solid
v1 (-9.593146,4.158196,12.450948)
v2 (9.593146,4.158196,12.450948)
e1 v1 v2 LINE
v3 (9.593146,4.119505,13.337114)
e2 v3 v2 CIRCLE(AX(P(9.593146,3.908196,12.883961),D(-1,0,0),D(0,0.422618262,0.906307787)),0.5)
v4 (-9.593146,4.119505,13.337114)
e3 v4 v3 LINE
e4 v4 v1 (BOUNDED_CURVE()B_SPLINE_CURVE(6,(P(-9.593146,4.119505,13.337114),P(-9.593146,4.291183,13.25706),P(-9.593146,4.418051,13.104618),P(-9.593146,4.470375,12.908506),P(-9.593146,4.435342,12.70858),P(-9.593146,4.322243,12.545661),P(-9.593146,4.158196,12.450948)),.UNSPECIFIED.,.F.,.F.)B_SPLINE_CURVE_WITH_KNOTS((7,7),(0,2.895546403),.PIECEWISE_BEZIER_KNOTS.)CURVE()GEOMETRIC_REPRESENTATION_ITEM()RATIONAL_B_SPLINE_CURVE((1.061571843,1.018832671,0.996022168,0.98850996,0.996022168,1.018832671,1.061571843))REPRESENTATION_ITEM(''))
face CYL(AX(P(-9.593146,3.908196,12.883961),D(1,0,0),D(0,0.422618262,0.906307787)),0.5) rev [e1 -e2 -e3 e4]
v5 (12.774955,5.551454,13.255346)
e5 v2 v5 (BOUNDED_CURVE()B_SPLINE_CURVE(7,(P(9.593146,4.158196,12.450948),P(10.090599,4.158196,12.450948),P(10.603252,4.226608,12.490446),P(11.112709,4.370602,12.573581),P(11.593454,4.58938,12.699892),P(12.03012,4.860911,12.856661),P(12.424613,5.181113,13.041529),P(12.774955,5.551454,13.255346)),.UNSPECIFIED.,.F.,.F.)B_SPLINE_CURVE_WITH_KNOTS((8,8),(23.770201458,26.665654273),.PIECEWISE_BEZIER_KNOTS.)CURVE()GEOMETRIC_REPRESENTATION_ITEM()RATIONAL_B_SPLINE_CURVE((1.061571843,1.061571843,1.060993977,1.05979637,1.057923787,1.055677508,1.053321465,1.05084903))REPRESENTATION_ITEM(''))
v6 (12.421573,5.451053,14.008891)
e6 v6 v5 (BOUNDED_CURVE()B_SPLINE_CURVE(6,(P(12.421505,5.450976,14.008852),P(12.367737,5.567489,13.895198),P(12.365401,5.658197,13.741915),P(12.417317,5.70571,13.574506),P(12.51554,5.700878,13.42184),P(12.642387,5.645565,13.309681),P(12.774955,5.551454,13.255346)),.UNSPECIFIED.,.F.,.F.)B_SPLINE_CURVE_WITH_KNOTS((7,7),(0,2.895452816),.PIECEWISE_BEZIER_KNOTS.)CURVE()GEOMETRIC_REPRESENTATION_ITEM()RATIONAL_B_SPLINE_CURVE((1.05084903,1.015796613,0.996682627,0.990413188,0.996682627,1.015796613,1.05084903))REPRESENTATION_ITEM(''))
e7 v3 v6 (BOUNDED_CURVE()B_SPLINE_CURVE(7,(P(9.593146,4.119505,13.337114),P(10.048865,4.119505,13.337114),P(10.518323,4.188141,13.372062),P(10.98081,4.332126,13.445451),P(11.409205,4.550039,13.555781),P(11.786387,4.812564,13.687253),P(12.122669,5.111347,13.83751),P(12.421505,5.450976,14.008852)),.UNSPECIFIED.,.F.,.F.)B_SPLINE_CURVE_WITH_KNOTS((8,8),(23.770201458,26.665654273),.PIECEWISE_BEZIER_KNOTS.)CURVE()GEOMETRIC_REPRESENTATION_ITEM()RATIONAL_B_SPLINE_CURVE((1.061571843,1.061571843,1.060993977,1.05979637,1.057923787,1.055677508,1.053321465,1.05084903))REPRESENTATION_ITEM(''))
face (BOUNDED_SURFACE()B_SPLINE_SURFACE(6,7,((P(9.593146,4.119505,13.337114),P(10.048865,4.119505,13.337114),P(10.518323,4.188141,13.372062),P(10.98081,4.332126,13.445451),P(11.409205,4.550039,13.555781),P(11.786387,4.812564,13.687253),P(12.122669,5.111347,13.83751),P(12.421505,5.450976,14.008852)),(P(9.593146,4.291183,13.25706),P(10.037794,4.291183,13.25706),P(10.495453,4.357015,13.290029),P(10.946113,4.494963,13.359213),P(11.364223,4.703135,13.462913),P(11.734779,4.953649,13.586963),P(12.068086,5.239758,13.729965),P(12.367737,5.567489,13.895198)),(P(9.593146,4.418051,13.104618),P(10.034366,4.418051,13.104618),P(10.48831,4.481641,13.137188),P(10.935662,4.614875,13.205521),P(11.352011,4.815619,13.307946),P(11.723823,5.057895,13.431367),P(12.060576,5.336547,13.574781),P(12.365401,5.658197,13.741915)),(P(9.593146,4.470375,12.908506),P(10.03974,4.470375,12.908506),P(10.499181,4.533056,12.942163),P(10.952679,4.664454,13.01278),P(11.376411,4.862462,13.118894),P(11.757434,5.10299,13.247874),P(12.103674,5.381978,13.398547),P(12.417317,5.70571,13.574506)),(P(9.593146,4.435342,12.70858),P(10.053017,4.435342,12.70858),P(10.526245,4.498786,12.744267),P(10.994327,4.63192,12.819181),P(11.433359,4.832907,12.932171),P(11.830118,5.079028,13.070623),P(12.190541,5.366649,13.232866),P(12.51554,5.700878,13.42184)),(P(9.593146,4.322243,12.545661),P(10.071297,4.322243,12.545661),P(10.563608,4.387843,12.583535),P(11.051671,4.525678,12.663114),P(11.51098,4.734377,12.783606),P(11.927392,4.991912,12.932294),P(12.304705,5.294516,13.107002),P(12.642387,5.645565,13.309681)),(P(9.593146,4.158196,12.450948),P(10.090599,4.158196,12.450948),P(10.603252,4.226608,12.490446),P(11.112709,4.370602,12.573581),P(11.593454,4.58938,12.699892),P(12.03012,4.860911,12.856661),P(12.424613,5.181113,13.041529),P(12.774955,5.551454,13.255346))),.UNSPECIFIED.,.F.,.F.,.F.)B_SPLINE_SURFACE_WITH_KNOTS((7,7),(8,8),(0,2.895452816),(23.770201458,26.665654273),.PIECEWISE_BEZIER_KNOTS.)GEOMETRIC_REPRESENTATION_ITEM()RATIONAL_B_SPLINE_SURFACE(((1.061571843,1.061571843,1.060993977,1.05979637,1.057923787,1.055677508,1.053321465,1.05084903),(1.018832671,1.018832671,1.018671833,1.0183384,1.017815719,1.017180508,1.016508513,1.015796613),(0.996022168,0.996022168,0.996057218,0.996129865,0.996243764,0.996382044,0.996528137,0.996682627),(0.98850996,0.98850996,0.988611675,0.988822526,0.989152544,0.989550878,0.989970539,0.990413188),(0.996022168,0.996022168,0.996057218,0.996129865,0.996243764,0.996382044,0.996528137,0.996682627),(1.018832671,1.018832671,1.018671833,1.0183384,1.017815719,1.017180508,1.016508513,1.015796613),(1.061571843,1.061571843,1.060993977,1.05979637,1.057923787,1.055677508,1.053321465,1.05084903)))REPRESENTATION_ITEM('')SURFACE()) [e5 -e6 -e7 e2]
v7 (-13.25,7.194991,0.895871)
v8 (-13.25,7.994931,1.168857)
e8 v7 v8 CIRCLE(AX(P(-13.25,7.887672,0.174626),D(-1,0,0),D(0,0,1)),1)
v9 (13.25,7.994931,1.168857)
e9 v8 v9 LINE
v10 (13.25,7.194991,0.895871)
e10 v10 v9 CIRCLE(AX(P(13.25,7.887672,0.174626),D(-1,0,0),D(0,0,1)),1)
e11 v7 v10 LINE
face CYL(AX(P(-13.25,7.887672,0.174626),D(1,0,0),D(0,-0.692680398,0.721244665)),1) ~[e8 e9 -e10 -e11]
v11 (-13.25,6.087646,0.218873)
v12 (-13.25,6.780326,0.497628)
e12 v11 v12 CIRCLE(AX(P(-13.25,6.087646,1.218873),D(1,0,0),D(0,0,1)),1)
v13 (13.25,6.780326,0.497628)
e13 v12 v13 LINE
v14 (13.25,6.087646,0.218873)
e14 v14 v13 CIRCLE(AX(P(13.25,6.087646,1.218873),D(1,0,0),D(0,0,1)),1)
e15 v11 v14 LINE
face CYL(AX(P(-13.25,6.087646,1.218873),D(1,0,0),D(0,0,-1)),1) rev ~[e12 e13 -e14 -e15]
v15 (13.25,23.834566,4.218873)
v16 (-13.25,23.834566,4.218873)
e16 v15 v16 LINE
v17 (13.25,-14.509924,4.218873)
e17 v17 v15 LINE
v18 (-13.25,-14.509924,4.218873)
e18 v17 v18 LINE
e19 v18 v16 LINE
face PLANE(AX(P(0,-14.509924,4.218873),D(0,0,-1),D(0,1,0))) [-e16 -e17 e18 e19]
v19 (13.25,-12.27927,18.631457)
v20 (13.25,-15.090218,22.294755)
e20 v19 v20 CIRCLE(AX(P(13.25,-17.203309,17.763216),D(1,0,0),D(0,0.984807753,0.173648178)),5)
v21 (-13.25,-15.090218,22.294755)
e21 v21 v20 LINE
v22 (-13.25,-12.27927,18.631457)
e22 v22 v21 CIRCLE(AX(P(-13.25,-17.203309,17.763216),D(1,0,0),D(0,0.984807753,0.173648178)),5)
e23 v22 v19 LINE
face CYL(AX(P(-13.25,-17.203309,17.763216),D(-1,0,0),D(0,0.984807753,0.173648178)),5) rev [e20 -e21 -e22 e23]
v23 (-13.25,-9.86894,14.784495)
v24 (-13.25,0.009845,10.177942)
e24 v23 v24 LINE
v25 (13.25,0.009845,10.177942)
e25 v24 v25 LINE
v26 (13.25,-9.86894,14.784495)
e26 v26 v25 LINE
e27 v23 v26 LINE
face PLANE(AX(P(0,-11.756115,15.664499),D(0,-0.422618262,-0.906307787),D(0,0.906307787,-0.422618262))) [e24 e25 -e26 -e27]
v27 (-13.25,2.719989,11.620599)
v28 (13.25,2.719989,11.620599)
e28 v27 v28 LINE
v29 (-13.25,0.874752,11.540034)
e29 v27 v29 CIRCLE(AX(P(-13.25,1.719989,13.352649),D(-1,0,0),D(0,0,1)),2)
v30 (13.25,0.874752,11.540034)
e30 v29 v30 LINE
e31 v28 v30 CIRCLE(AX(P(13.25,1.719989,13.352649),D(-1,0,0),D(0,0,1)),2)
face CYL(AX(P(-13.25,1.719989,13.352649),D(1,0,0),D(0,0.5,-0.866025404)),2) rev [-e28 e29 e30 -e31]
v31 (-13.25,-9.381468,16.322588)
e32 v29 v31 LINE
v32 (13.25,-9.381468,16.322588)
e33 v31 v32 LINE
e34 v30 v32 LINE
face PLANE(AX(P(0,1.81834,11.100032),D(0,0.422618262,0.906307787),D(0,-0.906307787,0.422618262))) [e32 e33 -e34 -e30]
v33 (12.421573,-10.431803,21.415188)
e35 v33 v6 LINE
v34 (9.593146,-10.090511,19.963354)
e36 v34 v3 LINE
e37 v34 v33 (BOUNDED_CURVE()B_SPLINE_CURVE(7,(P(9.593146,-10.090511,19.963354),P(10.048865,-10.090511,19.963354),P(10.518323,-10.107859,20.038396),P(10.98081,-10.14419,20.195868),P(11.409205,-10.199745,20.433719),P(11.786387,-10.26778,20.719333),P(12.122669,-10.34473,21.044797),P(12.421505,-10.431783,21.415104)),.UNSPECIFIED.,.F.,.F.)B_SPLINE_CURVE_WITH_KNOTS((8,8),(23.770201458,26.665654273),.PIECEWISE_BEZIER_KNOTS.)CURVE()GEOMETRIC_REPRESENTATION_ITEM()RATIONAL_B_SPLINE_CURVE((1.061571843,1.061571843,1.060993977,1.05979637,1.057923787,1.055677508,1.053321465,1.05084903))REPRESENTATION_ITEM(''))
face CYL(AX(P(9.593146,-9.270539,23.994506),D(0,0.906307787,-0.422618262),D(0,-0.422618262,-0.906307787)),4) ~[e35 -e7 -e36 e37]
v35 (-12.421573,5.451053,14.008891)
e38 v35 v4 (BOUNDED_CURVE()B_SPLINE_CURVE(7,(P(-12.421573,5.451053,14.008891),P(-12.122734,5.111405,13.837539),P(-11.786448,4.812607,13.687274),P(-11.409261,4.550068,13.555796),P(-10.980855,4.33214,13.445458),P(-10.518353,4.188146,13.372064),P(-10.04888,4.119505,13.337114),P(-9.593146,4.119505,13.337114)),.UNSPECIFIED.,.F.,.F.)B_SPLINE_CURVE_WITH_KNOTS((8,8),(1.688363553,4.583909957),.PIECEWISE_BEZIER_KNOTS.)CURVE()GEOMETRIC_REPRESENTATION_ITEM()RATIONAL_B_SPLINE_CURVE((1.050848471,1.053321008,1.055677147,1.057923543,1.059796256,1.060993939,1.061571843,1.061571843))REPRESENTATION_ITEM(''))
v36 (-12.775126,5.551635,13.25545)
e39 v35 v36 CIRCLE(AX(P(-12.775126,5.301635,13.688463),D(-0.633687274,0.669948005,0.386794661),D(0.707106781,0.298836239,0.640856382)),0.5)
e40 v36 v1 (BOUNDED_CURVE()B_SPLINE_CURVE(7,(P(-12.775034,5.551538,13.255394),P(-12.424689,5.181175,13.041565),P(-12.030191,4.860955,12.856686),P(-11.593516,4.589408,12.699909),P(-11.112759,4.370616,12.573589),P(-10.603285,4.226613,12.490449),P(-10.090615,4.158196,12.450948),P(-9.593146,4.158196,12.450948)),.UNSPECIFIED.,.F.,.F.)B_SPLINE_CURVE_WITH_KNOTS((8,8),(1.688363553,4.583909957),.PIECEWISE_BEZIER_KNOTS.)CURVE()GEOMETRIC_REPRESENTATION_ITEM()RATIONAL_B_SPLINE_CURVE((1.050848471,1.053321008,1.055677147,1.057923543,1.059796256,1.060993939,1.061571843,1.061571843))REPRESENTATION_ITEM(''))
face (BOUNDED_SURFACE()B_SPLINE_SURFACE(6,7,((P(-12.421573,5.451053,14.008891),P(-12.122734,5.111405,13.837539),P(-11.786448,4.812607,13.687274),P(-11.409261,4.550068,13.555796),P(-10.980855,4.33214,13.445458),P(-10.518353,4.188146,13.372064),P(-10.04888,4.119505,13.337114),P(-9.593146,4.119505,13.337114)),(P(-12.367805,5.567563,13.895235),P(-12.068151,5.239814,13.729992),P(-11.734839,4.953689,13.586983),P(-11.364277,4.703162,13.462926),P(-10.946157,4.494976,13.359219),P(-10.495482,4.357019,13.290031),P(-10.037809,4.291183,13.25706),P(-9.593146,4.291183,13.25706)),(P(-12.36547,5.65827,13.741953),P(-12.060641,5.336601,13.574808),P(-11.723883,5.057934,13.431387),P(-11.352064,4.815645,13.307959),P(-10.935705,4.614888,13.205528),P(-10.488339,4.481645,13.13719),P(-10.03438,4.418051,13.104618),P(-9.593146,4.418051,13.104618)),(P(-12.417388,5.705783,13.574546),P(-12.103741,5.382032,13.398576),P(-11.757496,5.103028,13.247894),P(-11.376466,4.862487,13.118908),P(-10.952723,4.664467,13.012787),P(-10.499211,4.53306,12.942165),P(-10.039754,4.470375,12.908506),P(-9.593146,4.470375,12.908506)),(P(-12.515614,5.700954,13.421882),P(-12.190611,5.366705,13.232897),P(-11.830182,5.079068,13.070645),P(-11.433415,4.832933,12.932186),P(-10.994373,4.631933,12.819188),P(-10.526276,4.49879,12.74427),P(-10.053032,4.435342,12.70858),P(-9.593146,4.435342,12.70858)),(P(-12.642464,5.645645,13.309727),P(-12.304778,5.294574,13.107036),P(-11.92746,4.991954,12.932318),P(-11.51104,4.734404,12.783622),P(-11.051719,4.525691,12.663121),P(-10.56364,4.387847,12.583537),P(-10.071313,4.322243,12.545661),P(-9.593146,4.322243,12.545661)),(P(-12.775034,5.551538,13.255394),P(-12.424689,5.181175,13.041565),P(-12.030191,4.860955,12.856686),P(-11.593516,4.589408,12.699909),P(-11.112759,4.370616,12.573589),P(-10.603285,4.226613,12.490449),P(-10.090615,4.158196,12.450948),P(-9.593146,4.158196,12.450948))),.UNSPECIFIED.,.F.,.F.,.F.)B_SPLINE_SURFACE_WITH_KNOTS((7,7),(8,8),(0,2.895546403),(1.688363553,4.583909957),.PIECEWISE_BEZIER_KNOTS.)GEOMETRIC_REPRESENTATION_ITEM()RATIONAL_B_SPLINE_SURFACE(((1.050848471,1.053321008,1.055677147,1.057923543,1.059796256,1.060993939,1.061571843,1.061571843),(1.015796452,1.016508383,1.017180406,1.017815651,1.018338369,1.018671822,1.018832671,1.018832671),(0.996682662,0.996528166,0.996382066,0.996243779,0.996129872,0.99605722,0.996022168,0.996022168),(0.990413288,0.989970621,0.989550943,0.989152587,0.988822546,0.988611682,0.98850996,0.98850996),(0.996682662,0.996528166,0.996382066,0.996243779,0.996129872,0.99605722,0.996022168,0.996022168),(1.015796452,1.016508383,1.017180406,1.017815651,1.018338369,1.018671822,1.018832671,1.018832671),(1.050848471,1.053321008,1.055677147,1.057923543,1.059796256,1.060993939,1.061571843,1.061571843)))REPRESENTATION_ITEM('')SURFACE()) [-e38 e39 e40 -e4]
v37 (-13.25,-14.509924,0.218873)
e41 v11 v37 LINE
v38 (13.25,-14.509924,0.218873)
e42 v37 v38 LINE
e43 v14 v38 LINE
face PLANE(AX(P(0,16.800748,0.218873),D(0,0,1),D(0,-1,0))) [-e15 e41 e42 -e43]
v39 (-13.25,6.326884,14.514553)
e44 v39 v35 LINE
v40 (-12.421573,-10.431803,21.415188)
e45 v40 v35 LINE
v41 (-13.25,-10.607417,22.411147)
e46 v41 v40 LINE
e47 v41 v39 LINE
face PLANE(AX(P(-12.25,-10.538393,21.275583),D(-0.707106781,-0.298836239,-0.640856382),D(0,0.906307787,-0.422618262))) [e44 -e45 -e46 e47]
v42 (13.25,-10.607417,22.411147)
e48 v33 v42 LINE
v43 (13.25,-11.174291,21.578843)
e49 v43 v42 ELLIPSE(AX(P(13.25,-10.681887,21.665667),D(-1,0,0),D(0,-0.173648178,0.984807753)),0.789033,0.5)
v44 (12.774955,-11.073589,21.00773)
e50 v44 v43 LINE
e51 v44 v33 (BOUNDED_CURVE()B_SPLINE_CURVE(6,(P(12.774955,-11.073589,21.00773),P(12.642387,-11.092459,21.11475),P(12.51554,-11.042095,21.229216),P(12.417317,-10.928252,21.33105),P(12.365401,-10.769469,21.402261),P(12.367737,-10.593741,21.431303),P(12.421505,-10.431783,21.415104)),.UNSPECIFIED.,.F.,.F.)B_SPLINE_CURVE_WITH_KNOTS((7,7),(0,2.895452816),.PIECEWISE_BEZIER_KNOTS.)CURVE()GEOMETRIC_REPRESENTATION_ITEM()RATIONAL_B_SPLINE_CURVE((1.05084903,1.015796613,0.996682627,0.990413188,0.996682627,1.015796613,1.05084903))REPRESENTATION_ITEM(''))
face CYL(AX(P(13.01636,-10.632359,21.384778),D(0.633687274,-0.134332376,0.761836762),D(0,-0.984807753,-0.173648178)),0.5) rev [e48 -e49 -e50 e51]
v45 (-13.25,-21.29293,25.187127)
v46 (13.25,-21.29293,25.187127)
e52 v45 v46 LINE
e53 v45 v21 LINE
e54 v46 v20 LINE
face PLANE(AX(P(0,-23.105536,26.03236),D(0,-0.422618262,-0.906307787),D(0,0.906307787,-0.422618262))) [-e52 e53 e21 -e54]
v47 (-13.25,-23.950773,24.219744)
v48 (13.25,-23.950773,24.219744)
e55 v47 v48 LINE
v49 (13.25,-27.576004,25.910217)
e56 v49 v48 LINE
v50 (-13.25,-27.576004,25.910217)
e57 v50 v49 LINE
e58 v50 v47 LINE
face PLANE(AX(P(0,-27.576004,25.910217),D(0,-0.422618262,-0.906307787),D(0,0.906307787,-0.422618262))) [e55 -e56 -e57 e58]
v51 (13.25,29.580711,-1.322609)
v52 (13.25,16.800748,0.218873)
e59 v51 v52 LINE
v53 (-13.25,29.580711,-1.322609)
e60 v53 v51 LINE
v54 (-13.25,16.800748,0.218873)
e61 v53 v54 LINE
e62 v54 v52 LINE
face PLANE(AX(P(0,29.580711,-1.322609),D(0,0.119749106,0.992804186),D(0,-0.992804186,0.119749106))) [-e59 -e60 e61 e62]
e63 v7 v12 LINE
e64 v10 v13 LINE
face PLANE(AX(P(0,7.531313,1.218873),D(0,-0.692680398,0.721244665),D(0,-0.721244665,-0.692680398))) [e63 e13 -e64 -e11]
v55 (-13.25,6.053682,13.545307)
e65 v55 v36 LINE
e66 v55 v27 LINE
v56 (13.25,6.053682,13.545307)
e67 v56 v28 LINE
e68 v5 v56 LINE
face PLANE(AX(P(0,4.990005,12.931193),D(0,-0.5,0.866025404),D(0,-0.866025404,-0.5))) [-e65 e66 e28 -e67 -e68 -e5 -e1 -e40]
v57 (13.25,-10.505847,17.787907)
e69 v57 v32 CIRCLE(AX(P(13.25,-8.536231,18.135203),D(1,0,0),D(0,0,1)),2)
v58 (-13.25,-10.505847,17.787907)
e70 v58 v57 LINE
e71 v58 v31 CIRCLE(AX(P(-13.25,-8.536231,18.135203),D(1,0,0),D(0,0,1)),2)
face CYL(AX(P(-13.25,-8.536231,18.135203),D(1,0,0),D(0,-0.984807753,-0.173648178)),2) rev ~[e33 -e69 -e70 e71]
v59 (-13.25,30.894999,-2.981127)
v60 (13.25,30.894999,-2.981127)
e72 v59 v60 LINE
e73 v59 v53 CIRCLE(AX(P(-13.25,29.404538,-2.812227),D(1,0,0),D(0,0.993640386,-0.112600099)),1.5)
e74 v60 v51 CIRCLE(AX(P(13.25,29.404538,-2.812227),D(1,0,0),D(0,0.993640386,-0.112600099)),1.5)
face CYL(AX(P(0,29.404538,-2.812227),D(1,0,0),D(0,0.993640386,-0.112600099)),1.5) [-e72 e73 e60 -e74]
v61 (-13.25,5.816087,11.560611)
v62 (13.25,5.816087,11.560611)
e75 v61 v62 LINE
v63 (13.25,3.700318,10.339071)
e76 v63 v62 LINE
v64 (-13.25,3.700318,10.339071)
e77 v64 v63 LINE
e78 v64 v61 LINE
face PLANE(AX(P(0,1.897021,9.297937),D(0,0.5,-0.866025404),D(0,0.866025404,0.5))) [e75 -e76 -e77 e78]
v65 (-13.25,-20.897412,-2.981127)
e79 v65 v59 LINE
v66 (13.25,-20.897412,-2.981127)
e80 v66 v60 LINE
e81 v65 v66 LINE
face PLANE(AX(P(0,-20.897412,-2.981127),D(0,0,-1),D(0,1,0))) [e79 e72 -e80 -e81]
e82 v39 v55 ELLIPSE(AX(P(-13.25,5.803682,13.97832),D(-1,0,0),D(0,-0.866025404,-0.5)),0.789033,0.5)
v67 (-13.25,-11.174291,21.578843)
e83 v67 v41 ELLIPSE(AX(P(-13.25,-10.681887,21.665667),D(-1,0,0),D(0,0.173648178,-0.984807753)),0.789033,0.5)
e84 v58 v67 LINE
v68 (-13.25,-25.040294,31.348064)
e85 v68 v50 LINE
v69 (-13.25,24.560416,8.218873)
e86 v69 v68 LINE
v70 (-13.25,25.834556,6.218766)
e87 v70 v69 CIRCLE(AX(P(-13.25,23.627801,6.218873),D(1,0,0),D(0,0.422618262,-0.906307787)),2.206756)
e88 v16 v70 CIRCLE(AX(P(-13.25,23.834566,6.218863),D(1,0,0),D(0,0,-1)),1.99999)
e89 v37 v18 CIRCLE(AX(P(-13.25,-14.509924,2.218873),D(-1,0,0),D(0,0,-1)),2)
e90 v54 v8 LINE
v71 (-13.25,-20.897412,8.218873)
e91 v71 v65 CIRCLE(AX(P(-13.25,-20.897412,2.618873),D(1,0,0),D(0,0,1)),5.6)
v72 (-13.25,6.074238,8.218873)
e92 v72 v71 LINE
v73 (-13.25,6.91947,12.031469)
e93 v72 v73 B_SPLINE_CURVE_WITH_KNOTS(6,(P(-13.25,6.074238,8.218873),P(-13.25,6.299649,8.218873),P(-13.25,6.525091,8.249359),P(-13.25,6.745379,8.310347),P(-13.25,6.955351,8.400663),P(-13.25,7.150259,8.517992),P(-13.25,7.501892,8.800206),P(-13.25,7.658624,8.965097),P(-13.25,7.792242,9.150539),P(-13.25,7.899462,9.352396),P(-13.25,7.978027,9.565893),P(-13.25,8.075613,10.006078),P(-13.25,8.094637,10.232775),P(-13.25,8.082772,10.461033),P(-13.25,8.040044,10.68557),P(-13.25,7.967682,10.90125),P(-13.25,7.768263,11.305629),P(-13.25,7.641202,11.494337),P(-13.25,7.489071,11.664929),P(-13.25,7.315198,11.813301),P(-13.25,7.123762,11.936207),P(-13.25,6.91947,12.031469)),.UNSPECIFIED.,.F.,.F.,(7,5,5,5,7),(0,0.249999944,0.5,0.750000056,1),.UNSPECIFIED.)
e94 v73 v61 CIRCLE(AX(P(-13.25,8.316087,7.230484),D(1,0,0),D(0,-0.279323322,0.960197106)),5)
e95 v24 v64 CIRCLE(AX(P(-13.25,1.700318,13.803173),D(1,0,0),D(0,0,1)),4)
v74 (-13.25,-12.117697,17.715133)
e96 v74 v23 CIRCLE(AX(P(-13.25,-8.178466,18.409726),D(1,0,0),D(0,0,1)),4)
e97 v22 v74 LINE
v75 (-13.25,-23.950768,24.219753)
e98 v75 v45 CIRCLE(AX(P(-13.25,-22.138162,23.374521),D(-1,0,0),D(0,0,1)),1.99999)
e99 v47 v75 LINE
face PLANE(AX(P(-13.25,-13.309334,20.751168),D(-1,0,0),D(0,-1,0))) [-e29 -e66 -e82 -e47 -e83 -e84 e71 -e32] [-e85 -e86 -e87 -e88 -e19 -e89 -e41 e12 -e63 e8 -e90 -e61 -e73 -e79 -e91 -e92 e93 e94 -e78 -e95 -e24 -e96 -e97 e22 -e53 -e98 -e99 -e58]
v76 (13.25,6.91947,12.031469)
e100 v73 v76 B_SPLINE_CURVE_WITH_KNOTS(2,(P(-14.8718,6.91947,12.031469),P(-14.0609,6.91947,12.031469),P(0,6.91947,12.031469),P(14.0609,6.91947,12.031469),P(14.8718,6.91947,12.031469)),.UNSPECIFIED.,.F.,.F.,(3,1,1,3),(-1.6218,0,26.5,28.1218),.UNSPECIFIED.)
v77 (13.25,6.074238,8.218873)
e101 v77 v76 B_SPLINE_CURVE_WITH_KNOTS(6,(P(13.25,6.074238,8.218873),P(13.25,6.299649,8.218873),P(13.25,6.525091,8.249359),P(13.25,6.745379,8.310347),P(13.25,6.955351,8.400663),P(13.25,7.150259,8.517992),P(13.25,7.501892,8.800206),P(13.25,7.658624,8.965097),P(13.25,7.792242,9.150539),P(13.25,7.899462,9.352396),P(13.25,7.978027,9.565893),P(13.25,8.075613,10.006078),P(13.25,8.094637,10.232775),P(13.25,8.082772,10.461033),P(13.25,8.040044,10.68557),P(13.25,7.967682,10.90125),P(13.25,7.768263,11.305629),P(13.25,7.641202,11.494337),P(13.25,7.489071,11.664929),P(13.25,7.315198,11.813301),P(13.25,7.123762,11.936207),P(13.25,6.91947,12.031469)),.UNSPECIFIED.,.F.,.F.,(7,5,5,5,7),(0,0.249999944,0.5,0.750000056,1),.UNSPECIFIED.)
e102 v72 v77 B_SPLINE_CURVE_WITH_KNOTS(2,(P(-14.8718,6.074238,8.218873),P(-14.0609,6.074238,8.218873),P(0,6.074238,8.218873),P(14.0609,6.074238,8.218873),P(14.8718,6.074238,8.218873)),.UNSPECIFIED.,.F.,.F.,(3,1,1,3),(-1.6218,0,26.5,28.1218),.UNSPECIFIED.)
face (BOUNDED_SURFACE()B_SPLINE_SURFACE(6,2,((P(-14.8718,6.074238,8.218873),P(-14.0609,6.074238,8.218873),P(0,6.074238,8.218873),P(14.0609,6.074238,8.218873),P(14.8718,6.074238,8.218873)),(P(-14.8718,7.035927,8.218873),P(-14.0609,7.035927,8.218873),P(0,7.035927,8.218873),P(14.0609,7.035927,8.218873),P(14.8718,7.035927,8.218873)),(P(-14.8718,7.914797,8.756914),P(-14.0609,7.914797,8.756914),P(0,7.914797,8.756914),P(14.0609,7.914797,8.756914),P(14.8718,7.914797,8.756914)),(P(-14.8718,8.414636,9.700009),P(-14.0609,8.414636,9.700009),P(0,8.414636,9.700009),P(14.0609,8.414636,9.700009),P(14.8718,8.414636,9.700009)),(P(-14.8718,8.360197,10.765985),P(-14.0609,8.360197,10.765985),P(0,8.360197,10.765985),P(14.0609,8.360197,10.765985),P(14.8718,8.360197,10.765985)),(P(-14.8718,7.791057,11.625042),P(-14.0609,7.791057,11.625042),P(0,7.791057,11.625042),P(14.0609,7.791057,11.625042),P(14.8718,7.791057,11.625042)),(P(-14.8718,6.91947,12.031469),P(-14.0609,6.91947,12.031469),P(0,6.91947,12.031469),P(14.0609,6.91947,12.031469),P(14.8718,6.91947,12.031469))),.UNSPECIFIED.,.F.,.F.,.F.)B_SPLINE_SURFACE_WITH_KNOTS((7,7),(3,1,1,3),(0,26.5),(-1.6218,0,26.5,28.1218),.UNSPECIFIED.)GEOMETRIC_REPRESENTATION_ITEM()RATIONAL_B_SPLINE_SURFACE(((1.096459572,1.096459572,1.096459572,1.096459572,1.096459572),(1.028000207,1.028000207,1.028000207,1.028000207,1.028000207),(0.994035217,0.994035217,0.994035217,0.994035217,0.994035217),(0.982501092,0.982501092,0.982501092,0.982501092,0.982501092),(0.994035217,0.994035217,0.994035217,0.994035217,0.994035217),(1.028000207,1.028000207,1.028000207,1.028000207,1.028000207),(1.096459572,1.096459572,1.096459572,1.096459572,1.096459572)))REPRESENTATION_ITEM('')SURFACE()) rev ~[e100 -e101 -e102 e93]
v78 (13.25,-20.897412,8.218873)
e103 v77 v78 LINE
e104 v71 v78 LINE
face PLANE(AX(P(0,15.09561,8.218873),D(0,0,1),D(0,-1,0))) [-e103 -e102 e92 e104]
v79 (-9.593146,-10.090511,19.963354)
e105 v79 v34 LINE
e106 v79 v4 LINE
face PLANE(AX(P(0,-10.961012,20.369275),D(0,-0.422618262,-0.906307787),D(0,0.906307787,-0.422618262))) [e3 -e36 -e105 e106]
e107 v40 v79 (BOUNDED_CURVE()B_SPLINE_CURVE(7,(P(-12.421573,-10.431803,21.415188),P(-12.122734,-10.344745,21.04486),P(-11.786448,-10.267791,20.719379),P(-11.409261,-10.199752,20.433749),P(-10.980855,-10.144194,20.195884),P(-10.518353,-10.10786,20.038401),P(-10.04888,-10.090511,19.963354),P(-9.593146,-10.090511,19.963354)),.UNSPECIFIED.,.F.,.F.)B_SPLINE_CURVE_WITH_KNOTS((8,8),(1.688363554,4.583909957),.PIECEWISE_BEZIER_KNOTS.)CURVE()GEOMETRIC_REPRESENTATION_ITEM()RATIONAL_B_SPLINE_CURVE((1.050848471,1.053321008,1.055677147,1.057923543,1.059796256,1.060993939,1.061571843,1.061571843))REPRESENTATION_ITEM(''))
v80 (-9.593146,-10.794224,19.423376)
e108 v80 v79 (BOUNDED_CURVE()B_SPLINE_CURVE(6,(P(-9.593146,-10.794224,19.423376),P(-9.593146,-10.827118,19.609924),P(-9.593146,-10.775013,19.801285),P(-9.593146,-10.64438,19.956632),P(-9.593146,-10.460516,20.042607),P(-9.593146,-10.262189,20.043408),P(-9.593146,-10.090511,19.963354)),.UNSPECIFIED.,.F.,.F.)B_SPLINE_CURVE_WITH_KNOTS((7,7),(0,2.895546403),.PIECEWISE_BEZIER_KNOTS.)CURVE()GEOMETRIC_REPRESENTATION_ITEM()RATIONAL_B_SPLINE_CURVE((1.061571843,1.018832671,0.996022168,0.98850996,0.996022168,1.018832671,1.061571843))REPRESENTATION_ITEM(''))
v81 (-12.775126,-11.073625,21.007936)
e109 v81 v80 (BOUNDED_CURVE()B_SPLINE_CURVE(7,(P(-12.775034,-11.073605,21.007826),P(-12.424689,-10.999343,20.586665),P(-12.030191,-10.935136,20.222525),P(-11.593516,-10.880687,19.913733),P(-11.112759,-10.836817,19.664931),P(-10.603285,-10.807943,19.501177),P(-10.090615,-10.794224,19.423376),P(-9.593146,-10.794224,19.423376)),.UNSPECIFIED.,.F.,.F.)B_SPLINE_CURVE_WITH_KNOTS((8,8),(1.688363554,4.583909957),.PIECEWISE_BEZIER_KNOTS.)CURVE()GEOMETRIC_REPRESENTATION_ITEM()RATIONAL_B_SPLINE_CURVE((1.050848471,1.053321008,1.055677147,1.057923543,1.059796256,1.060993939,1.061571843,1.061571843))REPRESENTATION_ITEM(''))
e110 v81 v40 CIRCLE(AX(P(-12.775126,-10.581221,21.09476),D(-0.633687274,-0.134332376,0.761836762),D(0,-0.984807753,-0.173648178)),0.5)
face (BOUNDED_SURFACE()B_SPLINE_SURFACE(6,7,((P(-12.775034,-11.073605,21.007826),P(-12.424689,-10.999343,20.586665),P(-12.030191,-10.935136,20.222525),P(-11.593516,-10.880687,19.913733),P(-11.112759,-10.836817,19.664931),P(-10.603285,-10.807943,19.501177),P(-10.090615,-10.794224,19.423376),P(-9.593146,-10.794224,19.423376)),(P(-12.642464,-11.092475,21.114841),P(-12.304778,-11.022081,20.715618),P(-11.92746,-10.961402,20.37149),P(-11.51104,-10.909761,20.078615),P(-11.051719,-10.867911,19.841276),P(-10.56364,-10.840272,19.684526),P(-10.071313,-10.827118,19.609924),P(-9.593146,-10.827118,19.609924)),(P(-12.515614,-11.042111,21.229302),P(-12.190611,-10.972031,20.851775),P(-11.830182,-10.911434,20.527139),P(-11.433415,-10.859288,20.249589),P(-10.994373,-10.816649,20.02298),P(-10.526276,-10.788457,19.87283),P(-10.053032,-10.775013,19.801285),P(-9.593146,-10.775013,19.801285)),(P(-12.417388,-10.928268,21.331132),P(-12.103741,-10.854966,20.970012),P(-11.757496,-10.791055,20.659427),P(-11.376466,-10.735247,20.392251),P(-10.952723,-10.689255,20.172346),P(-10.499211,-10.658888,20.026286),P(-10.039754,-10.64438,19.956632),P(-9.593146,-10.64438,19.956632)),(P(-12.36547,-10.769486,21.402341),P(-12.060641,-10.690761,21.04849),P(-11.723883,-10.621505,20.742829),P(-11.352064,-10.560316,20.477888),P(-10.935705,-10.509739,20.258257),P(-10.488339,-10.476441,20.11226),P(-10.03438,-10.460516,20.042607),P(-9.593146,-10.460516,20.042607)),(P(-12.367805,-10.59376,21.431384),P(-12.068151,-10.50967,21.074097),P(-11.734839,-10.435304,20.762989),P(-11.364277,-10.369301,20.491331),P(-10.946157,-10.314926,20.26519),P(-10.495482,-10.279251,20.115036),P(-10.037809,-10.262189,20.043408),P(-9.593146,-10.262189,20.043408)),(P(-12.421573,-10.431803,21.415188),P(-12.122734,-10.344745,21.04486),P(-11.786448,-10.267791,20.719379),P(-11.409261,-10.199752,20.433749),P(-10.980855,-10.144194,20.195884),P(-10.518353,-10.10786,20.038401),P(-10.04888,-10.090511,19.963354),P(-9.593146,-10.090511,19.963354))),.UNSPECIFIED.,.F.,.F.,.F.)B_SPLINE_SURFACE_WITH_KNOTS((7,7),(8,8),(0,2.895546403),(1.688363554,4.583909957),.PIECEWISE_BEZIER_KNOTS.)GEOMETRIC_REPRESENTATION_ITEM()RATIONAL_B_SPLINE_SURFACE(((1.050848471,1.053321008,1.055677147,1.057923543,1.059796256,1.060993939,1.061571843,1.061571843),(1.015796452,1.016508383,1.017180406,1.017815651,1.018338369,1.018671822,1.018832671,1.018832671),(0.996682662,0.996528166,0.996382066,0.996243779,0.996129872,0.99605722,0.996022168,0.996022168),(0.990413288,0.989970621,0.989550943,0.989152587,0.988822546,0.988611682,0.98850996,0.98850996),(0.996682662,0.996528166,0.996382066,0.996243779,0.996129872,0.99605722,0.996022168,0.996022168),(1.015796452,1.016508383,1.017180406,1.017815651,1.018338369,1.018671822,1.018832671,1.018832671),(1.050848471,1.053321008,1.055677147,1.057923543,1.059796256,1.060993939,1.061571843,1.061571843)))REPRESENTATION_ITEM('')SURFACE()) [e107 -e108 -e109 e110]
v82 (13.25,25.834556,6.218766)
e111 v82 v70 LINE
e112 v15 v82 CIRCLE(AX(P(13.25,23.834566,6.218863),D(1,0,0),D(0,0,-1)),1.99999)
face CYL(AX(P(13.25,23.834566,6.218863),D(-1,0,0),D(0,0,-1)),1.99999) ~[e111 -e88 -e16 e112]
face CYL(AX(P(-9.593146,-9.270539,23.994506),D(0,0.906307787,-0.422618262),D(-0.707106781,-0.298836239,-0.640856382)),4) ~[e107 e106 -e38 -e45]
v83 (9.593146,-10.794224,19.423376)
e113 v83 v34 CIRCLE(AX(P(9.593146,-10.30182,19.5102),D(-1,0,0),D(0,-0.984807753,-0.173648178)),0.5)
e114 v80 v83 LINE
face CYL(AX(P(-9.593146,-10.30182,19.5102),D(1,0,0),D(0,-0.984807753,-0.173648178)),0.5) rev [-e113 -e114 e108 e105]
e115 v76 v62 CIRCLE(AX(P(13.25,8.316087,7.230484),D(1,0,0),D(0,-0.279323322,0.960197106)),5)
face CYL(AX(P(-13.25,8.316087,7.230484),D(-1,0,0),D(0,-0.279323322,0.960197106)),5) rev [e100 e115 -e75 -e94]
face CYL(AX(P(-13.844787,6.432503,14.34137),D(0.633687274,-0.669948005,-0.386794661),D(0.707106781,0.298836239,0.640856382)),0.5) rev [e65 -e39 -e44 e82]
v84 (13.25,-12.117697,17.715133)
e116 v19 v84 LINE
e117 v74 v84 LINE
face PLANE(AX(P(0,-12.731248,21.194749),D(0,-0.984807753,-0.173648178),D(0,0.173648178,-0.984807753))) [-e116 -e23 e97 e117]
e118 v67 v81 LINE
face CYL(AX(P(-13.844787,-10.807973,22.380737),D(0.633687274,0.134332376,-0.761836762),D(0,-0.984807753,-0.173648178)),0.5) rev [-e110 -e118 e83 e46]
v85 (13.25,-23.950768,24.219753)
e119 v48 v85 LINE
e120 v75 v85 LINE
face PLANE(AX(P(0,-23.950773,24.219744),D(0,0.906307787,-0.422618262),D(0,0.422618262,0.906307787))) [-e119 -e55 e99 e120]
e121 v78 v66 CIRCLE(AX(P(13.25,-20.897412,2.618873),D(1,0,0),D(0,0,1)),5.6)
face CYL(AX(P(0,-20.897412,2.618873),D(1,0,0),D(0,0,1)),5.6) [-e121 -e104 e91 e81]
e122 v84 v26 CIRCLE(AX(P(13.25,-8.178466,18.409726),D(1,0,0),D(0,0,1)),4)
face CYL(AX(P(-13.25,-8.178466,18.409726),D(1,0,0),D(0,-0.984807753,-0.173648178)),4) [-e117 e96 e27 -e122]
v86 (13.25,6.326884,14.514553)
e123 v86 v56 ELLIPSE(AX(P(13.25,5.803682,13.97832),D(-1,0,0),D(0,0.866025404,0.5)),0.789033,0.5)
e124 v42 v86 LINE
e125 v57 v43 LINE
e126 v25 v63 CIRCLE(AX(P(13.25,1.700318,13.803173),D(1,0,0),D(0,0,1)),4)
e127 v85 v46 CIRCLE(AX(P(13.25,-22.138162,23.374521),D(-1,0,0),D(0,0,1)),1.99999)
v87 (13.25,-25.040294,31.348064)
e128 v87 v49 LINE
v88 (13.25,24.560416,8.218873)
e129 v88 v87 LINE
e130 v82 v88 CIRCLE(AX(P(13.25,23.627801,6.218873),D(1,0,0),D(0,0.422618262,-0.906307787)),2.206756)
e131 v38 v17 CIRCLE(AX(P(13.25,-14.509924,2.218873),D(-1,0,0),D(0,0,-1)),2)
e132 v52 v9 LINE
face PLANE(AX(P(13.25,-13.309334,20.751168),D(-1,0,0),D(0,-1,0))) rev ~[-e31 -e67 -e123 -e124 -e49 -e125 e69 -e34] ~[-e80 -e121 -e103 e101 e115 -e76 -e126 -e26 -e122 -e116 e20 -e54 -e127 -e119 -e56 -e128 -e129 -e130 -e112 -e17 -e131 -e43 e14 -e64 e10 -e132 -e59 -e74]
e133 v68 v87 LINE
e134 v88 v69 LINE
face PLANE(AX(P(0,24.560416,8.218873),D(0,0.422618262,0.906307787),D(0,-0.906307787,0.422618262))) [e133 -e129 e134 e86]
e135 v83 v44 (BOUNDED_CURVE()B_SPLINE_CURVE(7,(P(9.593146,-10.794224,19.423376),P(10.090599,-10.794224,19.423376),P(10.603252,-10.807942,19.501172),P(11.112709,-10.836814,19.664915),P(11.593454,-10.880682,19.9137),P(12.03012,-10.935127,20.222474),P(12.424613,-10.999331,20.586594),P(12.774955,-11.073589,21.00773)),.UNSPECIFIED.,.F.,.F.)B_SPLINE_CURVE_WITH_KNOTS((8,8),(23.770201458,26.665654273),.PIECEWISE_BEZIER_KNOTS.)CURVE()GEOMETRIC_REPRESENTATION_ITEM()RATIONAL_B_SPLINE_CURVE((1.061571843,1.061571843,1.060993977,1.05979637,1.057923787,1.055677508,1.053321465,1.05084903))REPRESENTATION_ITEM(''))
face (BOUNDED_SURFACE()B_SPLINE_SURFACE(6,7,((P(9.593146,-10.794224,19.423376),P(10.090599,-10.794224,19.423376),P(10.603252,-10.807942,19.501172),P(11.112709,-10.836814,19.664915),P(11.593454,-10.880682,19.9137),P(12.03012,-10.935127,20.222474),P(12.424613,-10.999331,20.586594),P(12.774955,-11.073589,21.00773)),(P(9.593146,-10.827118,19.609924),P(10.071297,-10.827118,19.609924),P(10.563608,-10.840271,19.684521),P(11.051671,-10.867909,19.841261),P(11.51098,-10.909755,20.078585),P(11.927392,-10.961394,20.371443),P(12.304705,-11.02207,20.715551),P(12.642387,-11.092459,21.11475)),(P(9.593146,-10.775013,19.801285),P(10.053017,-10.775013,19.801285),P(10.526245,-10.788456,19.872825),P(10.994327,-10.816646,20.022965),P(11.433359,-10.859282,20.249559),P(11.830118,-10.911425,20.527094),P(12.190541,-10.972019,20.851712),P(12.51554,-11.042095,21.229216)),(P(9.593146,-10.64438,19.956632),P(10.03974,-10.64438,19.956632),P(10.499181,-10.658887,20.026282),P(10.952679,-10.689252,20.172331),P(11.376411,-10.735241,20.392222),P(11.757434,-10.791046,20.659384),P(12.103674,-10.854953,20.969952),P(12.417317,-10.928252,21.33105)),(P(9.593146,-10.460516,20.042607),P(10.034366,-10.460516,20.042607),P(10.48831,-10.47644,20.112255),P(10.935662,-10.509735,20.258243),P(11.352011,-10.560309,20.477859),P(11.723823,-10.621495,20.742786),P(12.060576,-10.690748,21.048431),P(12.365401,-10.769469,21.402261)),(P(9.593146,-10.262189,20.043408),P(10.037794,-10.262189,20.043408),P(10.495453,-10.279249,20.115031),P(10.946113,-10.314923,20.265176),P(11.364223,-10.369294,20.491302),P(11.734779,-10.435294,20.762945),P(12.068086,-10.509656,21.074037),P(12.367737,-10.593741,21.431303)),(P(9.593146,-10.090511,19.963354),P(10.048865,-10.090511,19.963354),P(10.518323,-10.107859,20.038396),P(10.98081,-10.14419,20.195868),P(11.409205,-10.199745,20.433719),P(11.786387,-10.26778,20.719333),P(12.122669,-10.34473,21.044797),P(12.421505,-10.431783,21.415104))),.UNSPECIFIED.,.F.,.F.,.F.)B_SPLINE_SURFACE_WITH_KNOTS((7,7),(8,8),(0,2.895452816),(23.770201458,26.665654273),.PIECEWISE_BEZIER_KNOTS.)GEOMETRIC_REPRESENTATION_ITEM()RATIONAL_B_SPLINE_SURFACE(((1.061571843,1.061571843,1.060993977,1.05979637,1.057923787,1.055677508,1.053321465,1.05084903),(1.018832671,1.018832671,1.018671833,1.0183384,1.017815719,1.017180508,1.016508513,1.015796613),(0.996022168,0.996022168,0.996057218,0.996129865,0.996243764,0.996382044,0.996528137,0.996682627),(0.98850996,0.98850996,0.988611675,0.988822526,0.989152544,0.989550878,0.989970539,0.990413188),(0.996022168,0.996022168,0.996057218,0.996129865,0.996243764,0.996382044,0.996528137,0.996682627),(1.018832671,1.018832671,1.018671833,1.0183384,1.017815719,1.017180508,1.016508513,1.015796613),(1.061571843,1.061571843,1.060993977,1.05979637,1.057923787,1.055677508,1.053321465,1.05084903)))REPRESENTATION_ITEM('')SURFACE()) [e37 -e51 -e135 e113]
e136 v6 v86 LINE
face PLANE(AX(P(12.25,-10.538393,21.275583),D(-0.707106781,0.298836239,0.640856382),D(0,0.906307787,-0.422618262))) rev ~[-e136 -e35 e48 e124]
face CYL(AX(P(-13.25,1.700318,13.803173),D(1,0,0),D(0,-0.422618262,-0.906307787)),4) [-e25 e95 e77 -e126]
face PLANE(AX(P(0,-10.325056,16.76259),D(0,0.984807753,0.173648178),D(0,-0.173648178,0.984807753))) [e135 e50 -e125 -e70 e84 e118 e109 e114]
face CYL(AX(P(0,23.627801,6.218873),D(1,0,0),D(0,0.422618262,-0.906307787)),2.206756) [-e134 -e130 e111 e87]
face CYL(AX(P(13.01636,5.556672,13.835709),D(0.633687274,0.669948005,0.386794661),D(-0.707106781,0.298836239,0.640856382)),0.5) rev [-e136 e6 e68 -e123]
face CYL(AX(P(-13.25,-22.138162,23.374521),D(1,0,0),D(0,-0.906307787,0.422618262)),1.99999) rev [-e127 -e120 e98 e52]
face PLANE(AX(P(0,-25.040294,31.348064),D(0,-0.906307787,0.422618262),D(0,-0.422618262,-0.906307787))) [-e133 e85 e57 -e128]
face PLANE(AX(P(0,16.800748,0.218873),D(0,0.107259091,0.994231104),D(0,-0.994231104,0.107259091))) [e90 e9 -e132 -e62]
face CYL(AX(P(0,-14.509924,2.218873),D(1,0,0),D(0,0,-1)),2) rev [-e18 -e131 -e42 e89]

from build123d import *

# Parameters (mm, degrees)
F1_DEPTH    = 13.25
F2_DEPTH    = 13.25
F3_R        = 1
F4_R        = 1.99999
F5_T1_DEPTH = 26.5
F6_R        = 4
F7_SIZE     = 2
F8_R        = 4
F9_R        = 2
F10_R       = 0.5


# Not quite as in the source:
# - a fillet or chamfer that OpenCascade refuses, or shapes differently, is made with other operations: its cross-section is extruded or revolved along the edge and cut away or added
# - a fillet or chamfer is up to 0.001 mm smaller than in the source, because OpenCascade refuses the exact size


with BuildPart() as f1:
    # F0 (on Right) → F1 (new body, symmetric)
    with BuildSketch(Plane.YZ):
        with BuildLine():
            Line((24.5604159161, 8.2188727885), (-25.0402941419, 31.3480637385))
            Line((-25.0402941419, 31.3480637385), (-27.5760037124, 25.9102170163))
            Line((-27.5760037124, 25.9102170163), (-23.9507725642, 24.2197439694))
            Line((-23.9507725642, 24.2197439694), (-23.1055360408, 26.0323595434))
            Line((-23.1055360408, 26.0323595434), (-12.7312477201, 21.1947494516))
            Line((-12.7312477201, 21.1947494516), (-10.9610116945, 20.3692748361))
            Line((-10.9610116945, 20.3692748361), (4.9900053574, 12.9311934295))
            Line((4.9900053574, 12.9311934295), (6.760241383, 12.105718814))
            Line((6.760241383, 12.105718814), (7.7089287185, 11.6633386442))
            Line((7.7089287185, 11.6633386442), (15.0956095835, 8.2188727885))
            Line((15.0956095835, 8.2188727885), (7.7089287185, 8.2188727885))
            Line((7.7089287185, 8.2188727885), (-20.8974118188, 8.2188727885))
            ThreePointArc((-20.8974118188, 8.2188727885), (-26.4974118188, 2.6188727885), (-20.8974118188, -2.9811272115))
            Line((-20.8974118188, -2.9811272115), (30.894998731, -2.9811272115))
            ThreePointArc((30.894998731, -2.9811272115), (30.580160342, -1.8806088655), (29.580710732, -1.3226085804))
            Line((29.580710732, -1.3226085804), (16.8007476451, 0.2188727885))
            Line((16.8007476451, 0.2188727885), (6.4900759503, 0.2188727885))
            Line((6.4900759503, 0.2188727885), (-14.5099240497, 0.2188727885))
            ThreePointArc((-14.5099240497, 0.2188727885), (-16.5099240497, 2.2188727885), (-14.5099240497, 4.2188727885))
            Line((-14.5099240497, 4.2188727885), (24.5604159161, 4.2188727885))
            ThreePointArc((24.5604159161, 4.2188727885), (25.8345564377, 6.2188727885), (24.5604159161, 8.2188727885))
        make_face()
        Polygon((-10.9610116945, 20.3692748361), (-12.7312477201, 21.1947494516), (-11.7561154197, 15.664499365), (1.8970210747, 9.2979372598), (6.760241383, 12.105718814), (4.9900053574, 12.9311934295), (1.8183399389, 11.1000315463), (-10.3250558464, 16.762589997), align=None)
    extrude(amount=F1_DEPTH, both=True)

    # F0 (on Right) → F2 (join, symmetric)
    with BuildSketch(Plane.YZ):
        with BuildLine():
            Line((15.0956095835, 8.2188727885), (7.7089287185, 11.6633386442))
            ThreePointArc((7.7089287185, 11.6633386442), (8.806112099, 9.9411057164), (7.7089287185, 8.2188727885))
            Line((7.7089287185, 8.2188727885), (15.0956095835, 8.2188727885))
        make_face()
        with BuildLine():
            Line((24.5604159161, 8.2188727885), (-25.0402941419, 31.3480637385))
            Line((-25.0402941419, 31.3480637385), (-27.5760037124, 25.9102170163))
            Line((-27.5760037124, 25.9102170163), (-23.9507725642, 24.2197439694))
            Line((-23.9507725642, 24.2197439694), (-23.1055360408, 26.0323595434))
            Line((-23.1055360408, 26.0323595434), (-12.7312477201, 21.1947494516))
            Line((-12.7312477201, 21.1947494516), (-10.9610116945, 20.3692748361))
            Line((-10.9610116945, 20.3692748361), (4.9900053574, 12.9311934295))
            Line((4.9900053574, 12.9311934295), (6.760241383, 12.105718814))
            Line((6.760241383, 12.105718814), (7.7089287185, 11.6633386442))
            Line((7.7089287185, 11.6633386442), (15.0956095835, 8.2188727885))
            Line((15.0956095835, 8.2188727885), (7.7089287185, 8.2188727885))
            Line((7.7089287185, 8.2188727885), (-20.8974118188, 8.2188727885))
            ThreePointArc((-20.8974118188, 8.2188727885), (-26.4974118188, 2.6188727885), (-20.8974118188, -2.9811272115))
            Line((-20.8974118188, -2.9811272115), (30.894998731, -2.9811272115))
            ThreePointArc((30.894998731, -2.9811272115), (30.580160342, -1.8806088655), (29.580710732, -1.3226085804))
            Line((29.580710732, -1.3226085804), (16.8007476451, 0.2188727885))
            Line((16.8007476451, 0.2188727885), (6.4900759503, 0.2188727885))
            Line((6.4900759503, 0.2188727885), (-14.5099240497, 0.2188727885))
            ThreePointArc((-14.5099240497, 0.2188727885), (-16.5099240497, 2.2188727885), (-14.5099240497, 4.2188727885))
            Line((-14.5099240497, 4.2188727885), (24.5604159161, 4.2188727885))
            ThreePointArc((24.5604159161, 4.2188727885), (25.8345564377, 6.2188727885), (24.5604159161, 8.2188727885))
        make_face()
        Polygon((7.5313132472, 1.2188727885), (6.4900759503, 0.2188727885), (16.8007476451, 0.2188727885), align=None)
    extrude(amount=F2_DEPTH, both=True)

    # F3
    f3_edges = [f1.edges().sort_by_distance(p)[0] for p in [
        (0, 6.490076, 0.218873),
        (0, 7.531313, 1.218873),
        (0, 16.800748, 0.218873),
    ]]
    fillet(f3_edges, radius=F3_R)

    # F4 (radius 2 in the source; OpenCascade refuses exactly that, so slightly less here)
    f4_edges = [f1.edges().sort_by_distance(p)[0] for p in [
        (0, -23.105536, 26.03236),
        (0, 24.560416, 8.218873),
        (0, 24.560416, 4.218873),
        (0, 7.708929, 8.218873),
        (0, 7.708929, 11.663339),
    ]]
    fillet(f4_edges, radius=F4_R)

    # F5: fillet of radius 5 on 2 edges, made by hand

    # F5_s2 → F5_t1 (join)
    with BuildSketch(Plane.YZ.offset(-13.25)):
        with BuildLine():
            ThreePointArc((-12.2792701217, 18.6314571149), (-13.2365421853, 20.8070233716), (-15.090217578, 22.2947551617))
            Line((-15.090217578, 22.2947551617), (-12.7312477201, 21.1947494516))
            Line((-12.7312477201, 21.1947494516), (-12.2792701217, 18.6314571149))
        make_face()
        with BuildLine():
            ThreePointArc((6.9194699805, 12.0314692995), (6.3536054599, 11.8292518467), (5.8160865891, 11.5606107896))
            Line((5.8160865891, 11.5606107896), (6.760241383, 12.105718814))
            Line((6.760241383, 12.105718814), (6.9194699805, 12.0314692995))
        make_face()
    extrude(amount=F5_T1_DEPTH)

    # F6
    f6_edges = [f1.edges().sort_by_distance(p)[0] for p in [
        (0, 1.897021, 9.297937),
        (0, -11.756115, 15.664499),
    ]]
    fillet(f6_edges, radius=F6_R)

    # F7
    f7_edges = [f1.edges().sort_by_distance(p)[0] for p in [
        (13.25, -2.985503, 16.650234),
        (-13.25, -2.985503, 16.650234),
    ]]
    chamfer(f7_edges, length=F7_SIZE)

    # F8
    f8_edges = [f1.edges().sort_by_distance(p)[0] for p in [
        (-11.25, -2.985503, 16.650234),
        (11.25, -2.985503, 16.650234),
    ]]
    fillet(f8_edges, radius=F8_R)

    # F9
    f9_edges = [f1.edges().sort_by_distance(p)[0] for p in [
        (0, -10.325056, 16.76259),
        (0, 1.81834, 11.100032),
    ]]
    fillet(f9_edges, radius=F9_R)

    # F10
    f10_edges = [f1.edges().sort_by_distance(p)[0] for p in [
        (-11.167025, 5.331118, 13.128135),
        (-11.167025, -11.029409, 20.757174),
        (11.123879, -11.025557, 20.735332),
        (0, -10.961012, 20.369275),
        (11.123879, 5.31191, 13.117045),
        (0, 4.990005, 12.931193),
    ]]
    fillet(f10_edges, radius=F10_R)


solid = f1.part
